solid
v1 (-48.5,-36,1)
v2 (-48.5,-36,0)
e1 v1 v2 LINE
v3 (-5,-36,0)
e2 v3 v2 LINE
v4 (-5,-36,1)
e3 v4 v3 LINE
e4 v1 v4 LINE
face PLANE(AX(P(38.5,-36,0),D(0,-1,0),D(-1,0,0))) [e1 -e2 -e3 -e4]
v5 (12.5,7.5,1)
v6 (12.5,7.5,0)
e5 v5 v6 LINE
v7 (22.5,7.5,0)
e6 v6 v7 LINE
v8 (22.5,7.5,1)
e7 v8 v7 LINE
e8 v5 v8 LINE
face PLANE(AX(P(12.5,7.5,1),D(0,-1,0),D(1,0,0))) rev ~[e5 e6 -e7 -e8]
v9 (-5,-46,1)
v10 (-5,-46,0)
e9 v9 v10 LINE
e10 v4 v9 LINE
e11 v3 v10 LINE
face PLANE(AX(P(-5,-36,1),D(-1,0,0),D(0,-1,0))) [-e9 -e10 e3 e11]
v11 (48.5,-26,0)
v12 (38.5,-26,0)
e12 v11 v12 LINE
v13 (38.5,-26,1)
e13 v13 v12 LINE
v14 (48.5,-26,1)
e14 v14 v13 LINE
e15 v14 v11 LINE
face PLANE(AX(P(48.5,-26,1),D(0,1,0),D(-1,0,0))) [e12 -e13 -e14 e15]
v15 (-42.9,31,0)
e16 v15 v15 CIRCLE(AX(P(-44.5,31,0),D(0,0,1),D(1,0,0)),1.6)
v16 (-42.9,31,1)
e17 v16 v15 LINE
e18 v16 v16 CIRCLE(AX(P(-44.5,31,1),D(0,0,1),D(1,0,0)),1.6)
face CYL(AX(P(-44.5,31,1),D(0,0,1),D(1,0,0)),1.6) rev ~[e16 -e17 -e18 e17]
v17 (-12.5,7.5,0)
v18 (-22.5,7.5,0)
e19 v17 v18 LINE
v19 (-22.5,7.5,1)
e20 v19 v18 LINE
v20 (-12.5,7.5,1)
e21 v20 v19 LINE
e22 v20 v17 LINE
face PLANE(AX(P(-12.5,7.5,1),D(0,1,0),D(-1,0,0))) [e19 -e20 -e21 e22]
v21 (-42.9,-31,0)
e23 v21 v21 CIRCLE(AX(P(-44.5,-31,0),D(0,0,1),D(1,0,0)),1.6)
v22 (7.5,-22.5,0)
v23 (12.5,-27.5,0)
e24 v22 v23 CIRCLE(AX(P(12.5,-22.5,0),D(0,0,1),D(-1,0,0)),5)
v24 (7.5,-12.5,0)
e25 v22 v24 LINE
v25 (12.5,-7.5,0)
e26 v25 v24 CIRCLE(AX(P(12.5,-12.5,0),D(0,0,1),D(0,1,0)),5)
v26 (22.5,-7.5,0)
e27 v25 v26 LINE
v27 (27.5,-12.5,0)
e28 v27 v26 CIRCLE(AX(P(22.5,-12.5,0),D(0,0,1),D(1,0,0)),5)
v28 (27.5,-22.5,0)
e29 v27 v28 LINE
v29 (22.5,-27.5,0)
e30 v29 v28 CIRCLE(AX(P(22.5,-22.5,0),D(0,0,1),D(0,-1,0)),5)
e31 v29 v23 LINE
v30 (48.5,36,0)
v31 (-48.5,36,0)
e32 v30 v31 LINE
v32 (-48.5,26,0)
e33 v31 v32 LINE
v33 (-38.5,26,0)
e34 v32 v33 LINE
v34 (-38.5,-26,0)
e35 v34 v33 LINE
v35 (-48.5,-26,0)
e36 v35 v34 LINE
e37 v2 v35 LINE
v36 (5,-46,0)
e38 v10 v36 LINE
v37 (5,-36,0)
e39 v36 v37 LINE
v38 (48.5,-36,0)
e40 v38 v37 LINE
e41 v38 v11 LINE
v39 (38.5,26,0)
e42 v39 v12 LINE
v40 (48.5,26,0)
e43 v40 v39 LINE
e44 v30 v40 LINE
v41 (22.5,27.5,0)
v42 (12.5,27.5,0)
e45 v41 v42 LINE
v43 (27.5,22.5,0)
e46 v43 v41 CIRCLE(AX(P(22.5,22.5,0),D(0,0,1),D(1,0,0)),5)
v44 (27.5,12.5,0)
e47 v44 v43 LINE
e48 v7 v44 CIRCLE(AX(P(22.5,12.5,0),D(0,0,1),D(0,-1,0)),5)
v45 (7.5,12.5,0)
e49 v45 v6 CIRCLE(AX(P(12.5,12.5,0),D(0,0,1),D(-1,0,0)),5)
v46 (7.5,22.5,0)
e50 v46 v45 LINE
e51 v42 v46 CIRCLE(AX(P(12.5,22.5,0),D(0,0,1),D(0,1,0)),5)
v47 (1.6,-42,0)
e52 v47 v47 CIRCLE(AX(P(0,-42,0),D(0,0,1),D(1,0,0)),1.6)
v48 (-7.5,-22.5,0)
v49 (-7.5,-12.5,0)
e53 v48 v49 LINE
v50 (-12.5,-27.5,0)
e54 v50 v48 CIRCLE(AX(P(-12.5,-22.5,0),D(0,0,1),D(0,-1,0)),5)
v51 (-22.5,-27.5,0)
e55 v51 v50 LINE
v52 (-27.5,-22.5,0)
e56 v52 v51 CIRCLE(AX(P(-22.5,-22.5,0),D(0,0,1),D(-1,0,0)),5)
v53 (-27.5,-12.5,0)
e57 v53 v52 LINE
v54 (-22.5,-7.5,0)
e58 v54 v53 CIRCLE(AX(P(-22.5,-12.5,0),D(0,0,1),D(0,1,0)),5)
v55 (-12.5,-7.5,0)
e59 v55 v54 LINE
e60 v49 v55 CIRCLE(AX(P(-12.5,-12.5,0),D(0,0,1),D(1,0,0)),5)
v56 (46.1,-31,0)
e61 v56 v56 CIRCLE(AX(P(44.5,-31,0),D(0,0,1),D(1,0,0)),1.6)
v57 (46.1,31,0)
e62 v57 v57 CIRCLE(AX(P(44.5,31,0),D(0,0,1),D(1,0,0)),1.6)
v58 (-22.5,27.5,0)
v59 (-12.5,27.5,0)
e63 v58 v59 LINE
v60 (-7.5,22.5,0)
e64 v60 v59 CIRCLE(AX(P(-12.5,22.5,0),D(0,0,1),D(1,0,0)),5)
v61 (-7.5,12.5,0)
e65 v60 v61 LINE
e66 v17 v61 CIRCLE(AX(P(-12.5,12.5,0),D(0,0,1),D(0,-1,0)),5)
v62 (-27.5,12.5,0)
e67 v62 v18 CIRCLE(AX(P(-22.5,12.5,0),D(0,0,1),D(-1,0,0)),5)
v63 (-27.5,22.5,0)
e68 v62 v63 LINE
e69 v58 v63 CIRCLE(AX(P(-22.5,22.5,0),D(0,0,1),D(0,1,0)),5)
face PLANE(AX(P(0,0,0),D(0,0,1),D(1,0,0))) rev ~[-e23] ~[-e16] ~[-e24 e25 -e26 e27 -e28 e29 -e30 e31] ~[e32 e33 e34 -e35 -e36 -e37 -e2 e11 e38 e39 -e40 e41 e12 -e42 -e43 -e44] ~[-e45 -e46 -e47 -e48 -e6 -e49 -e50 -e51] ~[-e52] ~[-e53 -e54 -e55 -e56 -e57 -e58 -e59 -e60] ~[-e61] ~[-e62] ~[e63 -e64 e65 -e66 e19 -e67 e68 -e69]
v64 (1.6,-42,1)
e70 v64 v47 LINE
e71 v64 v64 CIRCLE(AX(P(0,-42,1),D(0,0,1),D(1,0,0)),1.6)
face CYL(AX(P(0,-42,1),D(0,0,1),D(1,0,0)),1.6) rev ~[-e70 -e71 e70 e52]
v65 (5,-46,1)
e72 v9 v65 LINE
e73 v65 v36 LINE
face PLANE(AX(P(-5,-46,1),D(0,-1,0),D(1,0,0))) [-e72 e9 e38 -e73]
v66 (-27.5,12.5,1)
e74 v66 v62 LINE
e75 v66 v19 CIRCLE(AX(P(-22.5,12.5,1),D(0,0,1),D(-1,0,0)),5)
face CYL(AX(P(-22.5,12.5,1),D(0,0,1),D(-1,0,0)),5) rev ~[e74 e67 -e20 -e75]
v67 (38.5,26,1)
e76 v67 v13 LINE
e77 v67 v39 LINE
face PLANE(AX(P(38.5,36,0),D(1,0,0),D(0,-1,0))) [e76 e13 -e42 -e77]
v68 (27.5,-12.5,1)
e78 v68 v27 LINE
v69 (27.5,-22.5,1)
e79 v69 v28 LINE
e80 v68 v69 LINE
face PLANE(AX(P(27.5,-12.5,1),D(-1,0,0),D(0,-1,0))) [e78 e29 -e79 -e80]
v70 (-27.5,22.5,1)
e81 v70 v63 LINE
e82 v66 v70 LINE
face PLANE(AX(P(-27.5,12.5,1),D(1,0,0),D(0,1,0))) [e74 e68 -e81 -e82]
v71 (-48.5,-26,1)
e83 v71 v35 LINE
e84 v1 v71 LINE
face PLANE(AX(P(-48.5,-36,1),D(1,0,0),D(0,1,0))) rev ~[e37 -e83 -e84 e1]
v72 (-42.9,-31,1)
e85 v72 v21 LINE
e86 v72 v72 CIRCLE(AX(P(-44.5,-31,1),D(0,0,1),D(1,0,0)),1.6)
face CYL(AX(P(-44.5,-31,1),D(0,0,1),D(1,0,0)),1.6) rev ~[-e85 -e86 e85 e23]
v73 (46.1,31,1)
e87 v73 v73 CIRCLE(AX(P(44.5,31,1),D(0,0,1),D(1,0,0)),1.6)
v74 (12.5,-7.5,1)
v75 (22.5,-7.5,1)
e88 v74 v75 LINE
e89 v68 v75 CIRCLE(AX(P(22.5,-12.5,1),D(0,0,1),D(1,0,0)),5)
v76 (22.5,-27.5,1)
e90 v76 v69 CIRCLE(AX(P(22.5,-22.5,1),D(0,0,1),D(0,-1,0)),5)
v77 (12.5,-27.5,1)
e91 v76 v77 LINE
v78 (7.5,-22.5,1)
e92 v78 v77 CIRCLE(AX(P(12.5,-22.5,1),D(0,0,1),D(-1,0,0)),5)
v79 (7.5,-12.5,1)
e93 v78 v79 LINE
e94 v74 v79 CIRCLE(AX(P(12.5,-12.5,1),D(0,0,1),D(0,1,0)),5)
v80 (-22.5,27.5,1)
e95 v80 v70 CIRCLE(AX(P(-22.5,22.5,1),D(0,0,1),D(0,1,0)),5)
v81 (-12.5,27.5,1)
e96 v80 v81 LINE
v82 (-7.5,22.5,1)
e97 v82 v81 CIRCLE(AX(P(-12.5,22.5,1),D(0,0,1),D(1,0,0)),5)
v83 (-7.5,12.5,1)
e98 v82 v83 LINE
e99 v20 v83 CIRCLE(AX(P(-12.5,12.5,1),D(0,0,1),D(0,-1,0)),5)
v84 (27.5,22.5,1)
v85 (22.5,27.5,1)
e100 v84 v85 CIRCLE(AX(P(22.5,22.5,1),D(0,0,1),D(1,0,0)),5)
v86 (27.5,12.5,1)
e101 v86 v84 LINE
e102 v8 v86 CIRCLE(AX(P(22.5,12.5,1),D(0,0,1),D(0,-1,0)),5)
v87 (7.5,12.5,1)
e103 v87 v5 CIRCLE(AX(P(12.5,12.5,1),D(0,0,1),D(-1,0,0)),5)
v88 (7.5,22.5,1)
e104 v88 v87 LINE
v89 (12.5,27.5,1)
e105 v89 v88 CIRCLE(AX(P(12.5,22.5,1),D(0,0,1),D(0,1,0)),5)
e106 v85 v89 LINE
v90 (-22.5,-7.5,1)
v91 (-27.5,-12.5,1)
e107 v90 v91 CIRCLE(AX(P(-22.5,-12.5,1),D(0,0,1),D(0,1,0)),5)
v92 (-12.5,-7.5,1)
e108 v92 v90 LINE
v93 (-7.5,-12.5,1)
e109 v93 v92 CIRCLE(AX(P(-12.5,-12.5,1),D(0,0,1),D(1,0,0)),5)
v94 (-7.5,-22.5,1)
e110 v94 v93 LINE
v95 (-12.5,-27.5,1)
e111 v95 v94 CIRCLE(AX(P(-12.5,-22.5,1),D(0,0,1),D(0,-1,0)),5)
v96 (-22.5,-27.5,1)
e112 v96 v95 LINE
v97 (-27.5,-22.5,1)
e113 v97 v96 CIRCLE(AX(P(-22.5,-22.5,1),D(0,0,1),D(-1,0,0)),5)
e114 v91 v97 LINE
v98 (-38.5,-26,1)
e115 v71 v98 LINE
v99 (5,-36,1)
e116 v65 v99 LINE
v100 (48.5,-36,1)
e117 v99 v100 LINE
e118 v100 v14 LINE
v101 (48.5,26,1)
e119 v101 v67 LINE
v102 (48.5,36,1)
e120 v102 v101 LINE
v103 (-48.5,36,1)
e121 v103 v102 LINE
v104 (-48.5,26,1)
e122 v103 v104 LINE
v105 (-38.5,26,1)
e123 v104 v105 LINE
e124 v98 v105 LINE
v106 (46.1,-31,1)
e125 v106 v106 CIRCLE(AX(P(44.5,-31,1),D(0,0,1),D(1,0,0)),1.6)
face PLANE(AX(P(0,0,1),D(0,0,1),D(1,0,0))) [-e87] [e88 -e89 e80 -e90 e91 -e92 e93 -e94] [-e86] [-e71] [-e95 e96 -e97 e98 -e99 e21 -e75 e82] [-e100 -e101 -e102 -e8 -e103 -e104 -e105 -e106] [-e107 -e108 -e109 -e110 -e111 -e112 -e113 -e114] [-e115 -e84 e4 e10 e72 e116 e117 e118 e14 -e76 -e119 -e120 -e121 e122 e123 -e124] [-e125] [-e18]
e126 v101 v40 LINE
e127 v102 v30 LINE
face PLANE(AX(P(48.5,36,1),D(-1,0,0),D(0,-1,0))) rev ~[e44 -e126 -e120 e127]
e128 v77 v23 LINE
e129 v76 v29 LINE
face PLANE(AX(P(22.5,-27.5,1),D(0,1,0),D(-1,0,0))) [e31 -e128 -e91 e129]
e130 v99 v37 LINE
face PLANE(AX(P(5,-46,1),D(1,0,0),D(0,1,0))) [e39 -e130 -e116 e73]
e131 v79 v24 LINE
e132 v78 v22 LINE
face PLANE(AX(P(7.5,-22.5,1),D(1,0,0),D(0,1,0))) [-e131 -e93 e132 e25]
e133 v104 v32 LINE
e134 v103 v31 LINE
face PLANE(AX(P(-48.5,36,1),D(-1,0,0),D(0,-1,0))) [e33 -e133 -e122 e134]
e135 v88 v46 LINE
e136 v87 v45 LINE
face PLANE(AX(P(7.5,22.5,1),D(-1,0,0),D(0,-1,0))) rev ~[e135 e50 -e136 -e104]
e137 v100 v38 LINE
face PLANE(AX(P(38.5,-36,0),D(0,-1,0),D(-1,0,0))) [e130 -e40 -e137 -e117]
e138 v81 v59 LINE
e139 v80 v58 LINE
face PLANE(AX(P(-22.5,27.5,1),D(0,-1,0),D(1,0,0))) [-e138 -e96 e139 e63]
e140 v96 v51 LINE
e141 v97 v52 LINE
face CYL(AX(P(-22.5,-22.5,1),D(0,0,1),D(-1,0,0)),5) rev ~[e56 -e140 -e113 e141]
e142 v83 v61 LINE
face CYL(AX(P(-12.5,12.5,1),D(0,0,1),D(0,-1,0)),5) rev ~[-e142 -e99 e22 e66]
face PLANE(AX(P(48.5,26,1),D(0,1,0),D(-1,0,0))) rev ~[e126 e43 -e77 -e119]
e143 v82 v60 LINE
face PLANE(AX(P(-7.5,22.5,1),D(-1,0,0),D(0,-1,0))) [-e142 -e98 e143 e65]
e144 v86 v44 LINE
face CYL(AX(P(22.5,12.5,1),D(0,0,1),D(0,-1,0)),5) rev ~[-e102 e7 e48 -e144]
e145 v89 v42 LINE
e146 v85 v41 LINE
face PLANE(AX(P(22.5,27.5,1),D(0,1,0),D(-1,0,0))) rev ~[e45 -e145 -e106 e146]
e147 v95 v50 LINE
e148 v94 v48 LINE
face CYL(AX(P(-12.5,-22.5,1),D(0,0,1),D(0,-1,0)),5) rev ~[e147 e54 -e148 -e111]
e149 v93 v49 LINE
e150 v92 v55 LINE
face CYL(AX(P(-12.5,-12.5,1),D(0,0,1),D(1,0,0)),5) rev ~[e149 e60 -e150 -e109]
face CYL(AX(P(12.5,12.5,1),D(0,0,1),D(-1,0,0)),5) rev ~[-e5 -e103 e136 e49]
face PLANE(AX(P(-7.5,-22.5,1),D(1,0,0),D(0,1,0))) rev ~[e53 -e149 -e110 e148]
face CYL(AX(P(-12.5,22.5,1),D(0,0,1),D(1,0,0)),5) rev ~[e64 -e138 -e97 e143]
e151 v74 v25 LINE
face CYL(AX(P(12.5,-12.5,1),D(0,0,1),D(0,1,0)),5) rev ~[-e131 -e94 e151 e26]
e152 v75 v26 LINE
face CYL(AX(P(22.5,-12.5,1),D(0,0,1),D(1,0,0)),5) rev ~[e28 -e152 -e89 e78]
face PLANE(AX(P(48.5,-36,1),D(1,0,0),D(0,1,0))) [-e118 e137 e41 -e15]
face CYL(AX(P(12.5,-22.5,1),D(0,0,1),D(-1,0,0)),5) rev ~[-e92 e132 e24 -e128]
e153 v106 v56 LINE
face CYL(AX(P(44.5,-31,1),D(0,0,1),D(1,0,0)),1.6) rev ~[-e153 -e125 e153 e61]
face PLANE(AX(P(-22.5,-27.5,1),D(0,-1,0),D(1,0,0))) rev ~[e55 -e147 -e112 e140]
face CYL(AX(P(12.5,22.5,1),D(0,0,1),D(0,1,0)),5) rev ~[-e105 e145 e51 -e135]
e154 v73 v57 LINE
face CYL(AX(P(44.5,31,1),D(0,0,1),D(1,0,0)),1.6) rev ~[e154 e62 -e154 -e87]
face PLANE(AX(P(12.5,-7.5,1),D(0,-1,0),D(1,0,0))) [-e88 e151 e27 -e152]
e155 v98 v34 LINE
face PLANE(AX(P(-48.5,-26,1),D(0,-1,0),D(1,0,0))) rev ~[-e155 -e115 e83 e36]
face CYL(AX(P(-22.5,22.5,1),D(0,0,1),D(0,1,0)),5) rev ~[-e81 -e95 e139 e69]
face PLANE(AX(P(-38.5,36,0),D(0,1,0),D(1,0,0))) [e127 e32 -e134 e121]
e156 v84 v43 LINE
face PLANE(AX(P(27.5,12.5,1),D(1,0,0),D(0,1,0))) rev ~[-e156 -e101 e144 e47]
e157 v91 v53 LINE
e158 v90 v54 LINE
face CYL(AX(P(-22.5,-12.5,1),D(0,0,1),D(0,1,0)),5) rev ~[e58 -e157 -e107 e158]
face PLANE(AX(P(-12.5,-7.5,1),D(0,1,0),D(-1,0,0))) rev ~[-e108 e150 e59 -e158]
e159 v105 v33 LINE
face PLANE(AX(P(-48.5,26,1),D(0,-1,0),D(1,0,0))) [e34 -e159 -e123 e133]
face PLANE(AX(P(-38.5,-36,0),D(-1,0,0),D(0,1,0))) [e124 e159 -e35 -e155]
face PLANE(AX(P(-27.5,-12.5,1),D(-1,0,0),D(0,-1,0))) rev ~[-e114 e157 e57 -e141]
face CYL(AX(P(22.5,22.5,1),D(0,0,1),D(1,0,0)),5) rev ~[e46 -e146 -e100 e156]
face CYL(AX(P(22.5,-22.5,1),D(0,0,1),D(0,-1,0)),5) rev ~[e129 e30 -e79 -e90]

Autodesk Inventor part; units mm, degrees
ref_plane "YZ Plane" through (0, 0, 0) normal (1, 0, 0) x (0, 1, 0)
ref_plane "XZ Plane" through (0, 0, 0) normal (0, 1, 0) x (-1, 0, 0)
ref_plane "XY Plane" through (0, 0, 0) normal (0, 0, 1) x (1, 0, 0)
sketch "Sketch2" plane through (0, 0, 1) normal (0, 0, 1) x (1, 0, 0)
  line L0 (-38.5, 36) -> (38.5, 36)
  line L1 (-48.5, 26) -> (-38.5, 26)
  line L2 (-38.5, 26) -> (-38.5, 36)
  line L3 (-38.5, 36) -> (-48.5, 36)
  line L4 (-48.5, 36) -> (-48.5, 26)
  line L5 (-48.5, 26) -> (-38.5, 36) construction
  line L6 (-38.5, 26) -> (-48.5, 36) construction
  line L7 (0, 0) -> (0, 7.0571)
  line L8 (0, 0) -> (6.6312, 0)
  line L9 (-38.5, -36) -> (-38.5, 36)
  line L10 (48.5, 26) -> (38.5, 26)
  line L11 (38.5, 26) -> (38.5, 36)
  line L12 (38.5, 36) -> (48.5, 36)
  line L13 (48.5, 36) -> (48.5, 26)
  line L14 (48.5, 26) -> (38.5, 36) construction
  line L15 (38.5, 26) -> (48.5, 36) construction
  circle A0 centre (-44.5, 31) radius 1.6
  circle A1 centre (44.5, 31) radius 1.6
  line L16 (38.5, -36) -> (-38.5, -36)
  line L17 (-5, -46) -> (5, -46)
  line L18 (5, -46) -> (5, -36)
  line L19 (5, -36) -> (-5, -36)
  line L20 (-5, -36) -> (-5, -46)
  line L21 (-5, -46) -> (5, -36) construction
  line L22 (5, -46) -> (-5, -36) construction
  circle A2 centre (0, -42) radius 1.6
  line L23 (-48.5, -26) -> (-38.5, -26)
  line L24 (-38.5, -26) -> (-38.5, -36)
  line L25 (-38.5, -36) -> (-48.5, -36)
  line L26 (-48.5, -36) -> (-48.5, -26)
  line L27 (-48.5, -26) -> (-38.5, -36) construction
  line L28 (-38.5, -26) -> (-48.5, -36) construction
  line L29 (38.5, -26) -> (38.5, -36)
  line L30 (38.5, -36) -> (48.5, -36)
  line L31 (48.5, -36) -> (48.5, -26)
  line L32 (48.5, -26) -> (38.5, -36) construction
  line L33 (38.5, -26) -> (48.5, -36) construction
  line L34 (48.5, -26) -> (38.5, -26)
  circle A3 centre (-44.5, -31) radius 1.6
  circle A4 centre (44.5, -31) radius 1.6
  point P0 (-43.5, 31)
  point P1 (43.5, 31)
  point P2 (0, -41)
  point P3 (-38.5, -36)
  point P4 (-43.5, -31)
  point P5 (43.5, -31)
  dimension "d5" = 10
  dimension "d6" = 10
  dimension "d10" = 3.2
  dimension "d12" = 4
  dimension "d18" = 3.2
  dimension "d19" = 10
  dimension "d20" = 10
  dimension "d21" = 4
  dimension "d22" = 5
sketch "Sketch1" plane through (0, 0, 0) normal (0, 0, 1) x (1, 0, 0)
  line L0 (-38.5, 36) -> (38.5, 36)
  line L1 (38.5, 36) -> (38.5, -36)
  line L2 (38.5, -36) -> (-38.5, -36)
  line L3 (-38.5, -36) -> (-38.5, 36)
  line L4 (-38.5, 36) -> (38.5, -36) construction
  line L5 (38.5, 36) -> (-38.5, -36) construction
  point P0 (0, 0)
  dimension "d0" = 72
  dimension "d1" = 77
extrude "Plate1" add sketch "Sketch1" along normal blind 1
sketch "Sketch3" plane through (0, 0, 1) normal (0, 0, 1) x (1, 0, 0)
  line L0 (-22.5, 27.5) -> (-12.5, 27.5)
  line L1 (-7.5, 22.5) -> (-7.5, 12.5)
  line L2 (-12.5, 7.5) -> (-22.5, 7.5)
  line L3 (-27.5, 12.5) -> (-27.5, 22.5)
  line L4 (-27.5, 27.5) -> (-7.5, 7.5) construction
  line L5 (-7.5, 27.5) -> (-27.5, 7.5) construction
  line L6 (-11.1923, 0) -> (11.1923, 0)
  line L7 (0, 8.4231) -> (0, -8.4231)
  arc A0 (-22.5, 27.5) -> (-27.5, 22.5) centre (-22.5, 22.5) ccw
  arc A1 (-7.5, 22.5) -> (-12.5, 27.5) centre (-12.5, 22.5) ccw
  arc A2 (-12.5, 7.5) -> (-7.5, 12.5) centre (-12.5, 12.5) ccw
  arc A3 (-27.5, 12.5) -> (-22.5, 7.5) centre (-22.5, 12.5) ccw
  line L8 (22.5, 27.5) -> (12.5, 27.5)
  line L9 (7.5, 22.5) -> (7.5, 12.5)
  line L10 (12.5, 7.5) -> (22.5, 7.5)
  line L11 (27.5, 12.5) -> (27.5, 22.5)
  line L12 (27.5, 27.5) -> (7.5, 7.5) construction
  line L13 (7.5, 27.5) -> (27.5, 7.5) construction
  arc A4 (27.5, 22.5) -> (22.5, 27.5) centre (22.5, 22.5) ccw
  arc A5 (12.5, 27.5) -> (7.5, 22.5) centre (12.5, 22.5) ccw
  arc A6 (7.5, 12.5) -> (12.5, 7.5) centre (12.5, 12.5) ccw
  arc A7 (22.5, 7.5) -> (27.5, 12.5) centre (22.5, 12.5) ccw
  line L14 (-22.5, -27.5) -> (-12.5, -27.5)
  line L15 (-7.5, -22.5) -> (-7.5, -12.5)
  line L16 (-12.5, -7.5) -> (-22.5, -7.5)
  line L17 (-27.5, -12.5) -> (-27.5, -22.5)
  line L18 (-27.5, -27.5) -> (-7.5, -7.5) construction
  line L19 (-7.5, -27.5) -> (-27.5, -7.5) construction
  arc A8 (-27.5, -22.5) -> (-22.5, -27.5) centre (-22.5, -22.5) ccw
  arc A9 (-12.5, -27.5) -> (-7.5, -22.5) centre (-12.5, -22.5) ccw
  arc A10 (-7.5, -12.5) -> (-12.5, -7.5) centre (-12.5, -12.5) ccw
  arc A11 (-22.5, -7.5) -> (-27.5, -12.5) centre (-22.5, -12.5) ccw
  line L20 (7.5, -22.5) -> (7.5, -12.5)
  arc A12 (12.5, -7.5) -> (7.5, -12.5) centre (12.5, -12.5) ccw
  arc A13 (7.5, -22.5) -> (12.5, -27.5) centre (12.5, -22.5) ccw
  line L21 (22.5, -27.5) -> (12.5, -27.5)
  line L22 (12.5, -7.5) -> (22.5, -7.5)
  line L23 (27.5, -27.5) -> (7.5, -7.5) construction
  line L24 (7.5, -27.5) -> (27.5, -7.5) construction
  arc A14 (27.5, -12.5) -> (22.5, -7.5) centre (22.5, -12.5) ccw
  line L25 (27.5, -12.5) -> (27.5, -22.5)
  arc A15 (22.5, -27.5) -> (27.5, -22.5) centre (22.5, -22.5) ccw
  point P0 (0, 0)
  point P1 (-17.5, 17.5)
  point P2 (0, 0)
  point P3 (17.5, 17.5)
  point P4 (-17.5, -17.5)
  point P5 (17.5, -17.5)
  dimension "d29" = 20
  dimension "d30" = 15
  dimension "d31" = 15
  dimension "d32" = 20
  dimension "d33" = 5
extrude "Cut1" cut sketch "Sketch3" against normal blind 1
sheet face with bend "Face2" sketch "Sketch2" thickness 1 toward (0, 0, -1) bend radius 1
bend "Bend1"
equation "\"d34\" = 厚度"
equation "\"d2\" = 厚度"
equation "\"d13\" = 折彎半徑"
equation "\"d14\" = 折彎離隙寬度"
equation "\"d16\" = 最小剩餘"
equation "\"d15\" = 折彎離隙深度"
equation "\"d17\" = 轉移半徑"
equation "\"折彎半徑\" = 厚度"
equation "\"折彎離隙寬度\" = 厚度"
equation "\"折彎離隙深度\" = 0.5 * 厚度"
equation "\"轉角離隙大小\" = 4 * 厚度"
equation "\"最小剩餘\" = 2 * 厚度"
equation "\"轉移半徑\" = 折彎半徑"
equation "\"Jacobi半徑大小\" = 折彎半徑"
equation "\"間隙大小\" = 厚度"
equation "\"厚度\" = 1"
properties part number "battery_box_24V_top" material "Aluminum"
